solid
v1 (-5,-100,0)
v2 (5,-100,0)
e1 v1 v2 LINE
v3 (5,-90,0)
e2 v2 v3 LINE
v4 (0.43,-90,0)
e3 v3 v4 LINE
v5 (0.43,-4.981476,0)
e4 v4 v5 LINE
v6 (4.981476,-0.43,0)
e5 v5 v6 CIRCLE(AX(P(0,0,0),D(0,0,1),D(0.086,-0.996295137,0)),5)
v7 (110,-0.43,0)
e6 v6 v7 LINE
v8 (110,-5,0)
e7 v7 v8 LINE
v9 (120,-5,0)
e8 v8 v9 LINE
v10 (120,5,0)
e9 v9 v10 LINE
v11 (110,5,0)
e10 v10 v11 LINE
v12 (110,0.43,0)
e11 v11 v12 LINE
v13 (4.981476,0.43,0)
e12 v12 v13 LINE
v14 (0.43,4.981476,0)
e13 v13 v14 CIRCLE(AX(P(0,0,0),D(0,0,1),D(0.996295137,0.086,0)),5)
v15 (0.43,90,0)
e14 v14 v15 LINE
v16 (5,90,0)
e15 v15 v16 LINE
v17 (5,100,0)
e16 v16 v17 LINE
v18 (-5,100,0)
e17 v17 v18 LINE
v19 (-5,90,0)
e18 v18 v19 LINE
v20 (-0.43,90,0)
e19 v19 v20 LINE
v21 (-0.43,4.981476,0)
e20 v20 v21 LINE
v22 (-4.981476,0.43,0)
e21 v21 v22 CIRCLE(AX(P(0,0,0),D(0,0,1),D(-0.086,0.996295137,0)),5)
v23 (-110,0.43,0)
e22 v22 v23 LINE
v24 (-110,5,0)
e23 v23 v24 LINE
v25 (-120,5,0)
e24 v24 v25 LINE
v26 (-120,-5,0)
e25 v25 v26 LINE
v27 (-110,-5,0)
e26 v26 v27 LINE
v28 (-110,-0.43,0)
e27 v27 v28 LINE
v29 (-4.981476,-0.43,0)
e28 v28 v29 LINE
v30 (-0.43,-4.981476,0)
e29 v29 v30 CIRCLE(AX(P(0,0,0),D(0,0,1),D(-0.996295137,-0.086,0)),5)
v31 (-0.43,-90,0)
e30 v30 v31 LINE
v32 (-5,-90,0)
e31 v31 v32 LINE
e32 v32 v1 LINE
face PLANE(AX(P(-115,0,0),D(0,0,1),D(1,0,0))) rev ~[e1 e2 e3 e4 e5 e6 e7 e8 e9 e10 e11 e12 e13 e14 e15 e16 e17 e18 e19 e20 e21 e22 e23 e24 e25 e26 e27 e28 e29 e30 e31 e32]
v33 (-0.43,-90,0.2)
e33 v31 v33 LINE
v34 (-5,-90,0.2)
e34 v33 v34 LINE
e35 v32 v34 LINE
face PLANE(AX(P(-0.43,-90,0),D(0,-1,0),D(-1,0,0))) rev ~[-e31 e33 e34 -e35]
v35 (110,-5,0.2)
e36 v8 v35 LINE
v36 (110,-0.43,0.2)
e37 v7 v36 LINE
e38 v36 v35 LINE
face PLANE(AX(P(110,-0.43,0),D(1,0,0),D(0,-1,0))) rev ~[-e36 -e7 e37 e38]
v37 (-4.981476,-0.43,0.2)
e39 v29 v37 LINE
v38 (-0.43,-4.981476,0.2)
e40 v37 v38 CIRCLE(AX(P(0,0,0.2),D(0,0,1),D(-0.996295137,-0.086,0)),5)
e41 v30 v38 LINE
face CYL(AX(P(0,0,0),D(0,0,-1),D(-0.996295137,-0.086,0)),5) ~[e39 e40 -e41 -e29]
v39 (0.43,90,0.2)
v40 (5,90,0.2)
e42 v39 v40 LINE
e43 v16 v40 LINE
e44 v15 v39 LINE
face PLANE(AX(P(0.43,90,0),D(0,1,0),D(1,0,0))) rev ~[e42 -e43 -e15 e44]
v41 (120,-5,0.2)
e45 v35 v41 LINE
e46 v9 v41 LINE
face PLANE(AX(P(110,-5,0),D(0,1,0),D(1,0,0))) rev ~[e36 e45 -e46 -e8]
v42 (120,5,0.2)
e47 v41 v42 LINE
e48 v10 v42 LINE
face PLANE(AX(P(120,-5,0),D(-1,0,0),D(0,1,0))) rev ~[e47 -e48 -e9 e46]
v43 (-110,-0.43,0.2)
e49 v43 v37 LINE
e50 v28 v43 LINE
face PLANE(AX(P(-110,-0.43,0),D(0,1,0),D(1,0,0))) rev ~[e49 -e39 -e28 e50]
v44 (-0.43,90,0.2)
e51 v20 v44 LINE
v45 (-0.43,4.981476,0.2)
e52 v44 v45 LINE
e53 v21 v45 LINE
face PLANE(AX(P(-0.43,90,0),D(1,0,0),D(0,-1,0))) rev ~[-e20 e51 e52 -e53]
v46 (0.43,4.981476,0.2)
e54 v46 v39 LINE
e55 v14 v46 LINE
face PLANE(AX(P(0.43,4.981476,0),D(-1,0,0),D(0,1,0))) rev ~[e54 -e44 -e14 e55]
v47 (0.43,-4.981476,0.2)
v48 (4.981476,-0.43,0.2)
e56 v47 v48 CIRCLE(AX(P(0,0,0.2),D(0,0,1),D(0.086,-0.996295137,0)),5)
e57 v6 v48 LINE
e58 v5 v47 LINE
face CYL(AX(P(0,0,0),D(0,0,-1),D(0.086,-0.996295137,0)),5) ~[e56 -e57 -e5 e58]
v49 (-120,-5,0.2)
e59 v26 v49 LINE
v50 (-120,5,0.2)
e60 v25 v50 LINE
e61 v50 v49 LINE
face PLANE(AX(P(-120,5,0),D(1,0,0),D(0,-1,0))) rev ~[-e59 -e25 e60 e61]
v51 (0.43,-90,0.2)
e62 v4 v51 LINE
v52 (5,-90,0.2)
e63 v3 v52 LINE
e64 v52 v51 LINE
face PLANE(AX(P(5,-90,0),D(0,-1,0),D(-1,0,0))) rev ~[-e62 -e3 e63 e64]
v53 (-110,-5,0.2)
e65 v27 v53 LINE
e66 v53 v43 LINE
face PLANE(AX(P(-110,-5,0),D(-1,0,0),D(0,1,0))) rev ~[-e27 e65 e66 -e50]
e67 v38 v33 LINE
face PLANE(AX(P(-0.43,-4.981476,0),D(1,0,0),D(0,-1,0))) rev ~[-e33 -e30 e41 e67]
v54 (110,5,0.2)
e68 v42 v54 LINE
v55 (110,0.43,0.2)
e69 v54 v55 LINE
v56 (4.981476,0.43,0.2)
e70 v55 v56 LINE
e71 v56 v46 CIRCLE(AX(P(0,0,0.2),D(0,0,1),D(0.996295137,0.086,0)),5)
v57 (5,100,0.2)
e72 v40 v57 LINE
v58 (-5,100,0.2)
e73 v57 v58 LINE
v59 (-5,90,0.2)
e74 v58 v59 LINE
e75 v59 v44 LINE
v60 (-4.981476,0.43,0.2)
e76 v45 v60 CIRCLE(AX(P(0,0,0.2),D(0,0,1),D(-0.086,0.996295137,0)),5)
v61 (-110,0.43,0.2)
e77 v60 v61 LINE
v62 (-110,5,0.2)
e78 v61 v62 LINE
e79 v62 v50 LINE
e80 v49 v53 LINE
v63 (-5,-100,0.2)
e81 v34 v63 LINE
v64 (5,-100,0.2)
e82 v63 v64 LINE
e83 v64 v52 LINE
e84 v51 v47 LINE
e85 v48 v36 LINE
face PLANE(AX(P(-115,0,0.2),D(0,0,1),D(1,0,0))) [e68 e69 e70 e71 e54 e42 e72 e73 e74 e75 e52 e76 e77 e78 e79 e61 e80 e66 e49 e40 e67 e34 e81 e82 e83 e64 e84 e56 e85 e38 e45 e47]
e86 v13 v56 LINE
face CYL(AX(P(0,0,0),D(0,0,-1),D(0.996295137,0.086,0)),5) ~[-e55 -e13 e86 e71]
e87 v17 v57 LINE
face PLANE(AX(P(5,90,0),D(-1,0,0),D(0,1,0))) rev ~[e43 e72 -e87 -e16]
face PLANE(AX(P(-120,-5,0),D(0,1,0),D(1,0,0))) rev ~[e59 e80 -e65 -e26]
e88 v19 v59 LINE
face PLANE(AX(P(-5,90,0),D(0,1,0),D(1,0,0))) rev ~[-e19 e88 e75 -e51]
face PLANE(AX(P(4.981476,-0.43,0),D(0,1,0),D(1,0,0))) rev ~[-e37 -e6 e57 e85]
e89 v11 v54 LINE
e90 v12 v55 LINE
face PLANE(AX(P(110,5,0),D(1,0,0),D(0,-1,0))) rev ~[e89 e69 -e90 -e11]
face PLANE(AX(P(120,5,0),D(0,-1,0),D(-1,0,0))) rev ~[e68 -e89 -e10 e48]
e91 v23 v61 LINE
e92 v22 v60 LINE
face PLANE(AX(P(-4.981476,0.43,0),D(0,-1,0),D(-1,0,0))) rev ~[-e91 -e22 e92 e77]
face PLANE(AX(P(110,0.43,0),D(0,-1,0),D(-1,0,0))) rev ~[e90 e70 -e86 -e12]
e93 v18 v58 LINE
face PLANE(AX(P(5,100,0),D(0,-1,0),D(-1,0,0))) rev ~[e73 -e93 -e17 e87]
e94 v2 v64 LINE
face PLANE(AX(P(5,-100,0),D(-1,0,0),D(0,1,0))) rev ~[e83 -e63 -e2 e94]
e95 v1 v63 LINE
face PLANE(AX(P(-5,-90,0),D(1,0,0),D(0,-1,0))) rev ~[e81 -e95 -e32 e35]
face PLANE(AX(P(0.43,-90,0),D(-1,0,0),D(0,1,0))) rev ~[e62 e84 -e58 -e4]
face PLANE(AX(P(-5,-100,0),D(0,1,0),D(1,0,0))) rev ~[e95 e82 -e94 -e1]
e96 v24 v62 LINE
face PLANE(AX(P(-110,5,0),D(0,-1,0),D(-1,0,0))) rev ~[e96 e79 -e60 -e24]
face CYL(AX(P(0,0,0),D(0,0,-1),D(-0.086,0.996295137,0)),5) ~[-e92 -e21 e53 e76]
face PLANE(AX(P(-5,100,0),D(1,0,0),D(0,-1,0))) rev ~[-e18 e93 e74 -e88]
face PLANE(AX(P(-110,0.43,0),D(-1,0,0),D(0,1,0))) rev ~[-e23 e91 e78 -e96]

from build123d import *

# Parameters (mm, degrees)
F1_DEPTH = 0.2


# Not quite as in the source:
# - a feature names something its author has since deleted; it is built from what else it names


with BuildPart() as f1:
    # F0 (on Top) → F1 (new body)
    with BuildSketch(Plane.XY):
        Polygon((-110, -0.43), (-110, 0.43), (-110, 5), (-120, 5), (-120, -5), (-110, -5), align=None)
        with BuildLine():
            ThreePointArc((-4.981475685, -0.43), (-5, 0), (-4.981475685, 0.43))
            Line((-4.981475685, 0.43), (-110, 0.43))
            Line((-110, 0.43), (-110, -0.43))
            Line((-110, -0.43), (-4.981475685, -0.43))
        make_face()
        with BuildLine():
            ThreePointArc((-0.43, 4.981475685), (0, 5), (0.43, 4.981475685))
            Line((0.43, 4.981475685), (0.43, 90))
            Line((0.43, 90), (-0.43, 90))
            Line((-0.43, 90), (-0.43, 4.981475685))
        make_face()
        with BuildLine():
            ThreePointArc((4.981475685, 0.43), (4.9953667746, 0.2151994135), (5, 0))
            ThreePointArc((5, 0), (4.9953667746, -0.2151994135), (4.981475685, -0.43))
            Line((4.981475685, -0.43), (110, -0.43))
            Line((110, -0.43), (110, 0.43))
            Line((110, 0.43), (4.981475685, 0.43))
        make_face()
        with BuildLine():
            Line((0.43, -90), (0.43, -4.981475685))
            ThreePointArc((0.43, -4.981475685), (0, -5), (-0.43, -4.981475685))
            Line((-0.43, -4.981475685), (-0.43, -90))
            Line((-0.43, -90), (0.43, -90))
        make_face()
        Polygon((110, 5), (110, 0.43), (110, -0.43), (110, -5), (120, -5), (120, 5), align=None)
        Polygon((5, -90), (0.43, -90), (-0.43, -90), (-5, -90), (-5, -100), (5, -100), align=None)
        Polygon((-0.43, 90), (0.43, 90), (5, 90), (5, 100), (-5, 100), (-5, 90), align=None)
        with BuildLine():
            ThreePointArc((4.981475685, -0.43), (4.9953667746, -0.2151994135), (5, 0))
            ThreePointArc((5, 0), (4.9953667746, 0.2151994135), (4.981475685, 0.43))
            ThreePointArc((4.981475685, 0.43), (3.5355339059, 3.5355339059), (0.43, 4.981475685))
            ThreePointArc((0.43, 4.981475685), (0, 5), (-0.43, 4.981475685))
            ThreePointArc((-0.43, 4.981475685), (-3.5355339059, 3.5355339059), (-4.981475685, 0.43))
            ThreePointArc((-4.981475685, 0.43), (-5, 0), (-4.981475685, -0.43))
            ThreePointArc((-4.981475685, -0.43), (-3.5355339059, -3.5355339059), (-0.43, -4.981475685))
            ThreePointArc((-0.43, -4.981475685), (0, -5), (0.43, -4.981475685))
            ThreePointArc((0.43, -4.981475685), (3.5355339059, -3.5355339059), (4.981475685, -0.43))
        make_face()
    extrude(amount=F1_DEPTH)


solid = f1.part
